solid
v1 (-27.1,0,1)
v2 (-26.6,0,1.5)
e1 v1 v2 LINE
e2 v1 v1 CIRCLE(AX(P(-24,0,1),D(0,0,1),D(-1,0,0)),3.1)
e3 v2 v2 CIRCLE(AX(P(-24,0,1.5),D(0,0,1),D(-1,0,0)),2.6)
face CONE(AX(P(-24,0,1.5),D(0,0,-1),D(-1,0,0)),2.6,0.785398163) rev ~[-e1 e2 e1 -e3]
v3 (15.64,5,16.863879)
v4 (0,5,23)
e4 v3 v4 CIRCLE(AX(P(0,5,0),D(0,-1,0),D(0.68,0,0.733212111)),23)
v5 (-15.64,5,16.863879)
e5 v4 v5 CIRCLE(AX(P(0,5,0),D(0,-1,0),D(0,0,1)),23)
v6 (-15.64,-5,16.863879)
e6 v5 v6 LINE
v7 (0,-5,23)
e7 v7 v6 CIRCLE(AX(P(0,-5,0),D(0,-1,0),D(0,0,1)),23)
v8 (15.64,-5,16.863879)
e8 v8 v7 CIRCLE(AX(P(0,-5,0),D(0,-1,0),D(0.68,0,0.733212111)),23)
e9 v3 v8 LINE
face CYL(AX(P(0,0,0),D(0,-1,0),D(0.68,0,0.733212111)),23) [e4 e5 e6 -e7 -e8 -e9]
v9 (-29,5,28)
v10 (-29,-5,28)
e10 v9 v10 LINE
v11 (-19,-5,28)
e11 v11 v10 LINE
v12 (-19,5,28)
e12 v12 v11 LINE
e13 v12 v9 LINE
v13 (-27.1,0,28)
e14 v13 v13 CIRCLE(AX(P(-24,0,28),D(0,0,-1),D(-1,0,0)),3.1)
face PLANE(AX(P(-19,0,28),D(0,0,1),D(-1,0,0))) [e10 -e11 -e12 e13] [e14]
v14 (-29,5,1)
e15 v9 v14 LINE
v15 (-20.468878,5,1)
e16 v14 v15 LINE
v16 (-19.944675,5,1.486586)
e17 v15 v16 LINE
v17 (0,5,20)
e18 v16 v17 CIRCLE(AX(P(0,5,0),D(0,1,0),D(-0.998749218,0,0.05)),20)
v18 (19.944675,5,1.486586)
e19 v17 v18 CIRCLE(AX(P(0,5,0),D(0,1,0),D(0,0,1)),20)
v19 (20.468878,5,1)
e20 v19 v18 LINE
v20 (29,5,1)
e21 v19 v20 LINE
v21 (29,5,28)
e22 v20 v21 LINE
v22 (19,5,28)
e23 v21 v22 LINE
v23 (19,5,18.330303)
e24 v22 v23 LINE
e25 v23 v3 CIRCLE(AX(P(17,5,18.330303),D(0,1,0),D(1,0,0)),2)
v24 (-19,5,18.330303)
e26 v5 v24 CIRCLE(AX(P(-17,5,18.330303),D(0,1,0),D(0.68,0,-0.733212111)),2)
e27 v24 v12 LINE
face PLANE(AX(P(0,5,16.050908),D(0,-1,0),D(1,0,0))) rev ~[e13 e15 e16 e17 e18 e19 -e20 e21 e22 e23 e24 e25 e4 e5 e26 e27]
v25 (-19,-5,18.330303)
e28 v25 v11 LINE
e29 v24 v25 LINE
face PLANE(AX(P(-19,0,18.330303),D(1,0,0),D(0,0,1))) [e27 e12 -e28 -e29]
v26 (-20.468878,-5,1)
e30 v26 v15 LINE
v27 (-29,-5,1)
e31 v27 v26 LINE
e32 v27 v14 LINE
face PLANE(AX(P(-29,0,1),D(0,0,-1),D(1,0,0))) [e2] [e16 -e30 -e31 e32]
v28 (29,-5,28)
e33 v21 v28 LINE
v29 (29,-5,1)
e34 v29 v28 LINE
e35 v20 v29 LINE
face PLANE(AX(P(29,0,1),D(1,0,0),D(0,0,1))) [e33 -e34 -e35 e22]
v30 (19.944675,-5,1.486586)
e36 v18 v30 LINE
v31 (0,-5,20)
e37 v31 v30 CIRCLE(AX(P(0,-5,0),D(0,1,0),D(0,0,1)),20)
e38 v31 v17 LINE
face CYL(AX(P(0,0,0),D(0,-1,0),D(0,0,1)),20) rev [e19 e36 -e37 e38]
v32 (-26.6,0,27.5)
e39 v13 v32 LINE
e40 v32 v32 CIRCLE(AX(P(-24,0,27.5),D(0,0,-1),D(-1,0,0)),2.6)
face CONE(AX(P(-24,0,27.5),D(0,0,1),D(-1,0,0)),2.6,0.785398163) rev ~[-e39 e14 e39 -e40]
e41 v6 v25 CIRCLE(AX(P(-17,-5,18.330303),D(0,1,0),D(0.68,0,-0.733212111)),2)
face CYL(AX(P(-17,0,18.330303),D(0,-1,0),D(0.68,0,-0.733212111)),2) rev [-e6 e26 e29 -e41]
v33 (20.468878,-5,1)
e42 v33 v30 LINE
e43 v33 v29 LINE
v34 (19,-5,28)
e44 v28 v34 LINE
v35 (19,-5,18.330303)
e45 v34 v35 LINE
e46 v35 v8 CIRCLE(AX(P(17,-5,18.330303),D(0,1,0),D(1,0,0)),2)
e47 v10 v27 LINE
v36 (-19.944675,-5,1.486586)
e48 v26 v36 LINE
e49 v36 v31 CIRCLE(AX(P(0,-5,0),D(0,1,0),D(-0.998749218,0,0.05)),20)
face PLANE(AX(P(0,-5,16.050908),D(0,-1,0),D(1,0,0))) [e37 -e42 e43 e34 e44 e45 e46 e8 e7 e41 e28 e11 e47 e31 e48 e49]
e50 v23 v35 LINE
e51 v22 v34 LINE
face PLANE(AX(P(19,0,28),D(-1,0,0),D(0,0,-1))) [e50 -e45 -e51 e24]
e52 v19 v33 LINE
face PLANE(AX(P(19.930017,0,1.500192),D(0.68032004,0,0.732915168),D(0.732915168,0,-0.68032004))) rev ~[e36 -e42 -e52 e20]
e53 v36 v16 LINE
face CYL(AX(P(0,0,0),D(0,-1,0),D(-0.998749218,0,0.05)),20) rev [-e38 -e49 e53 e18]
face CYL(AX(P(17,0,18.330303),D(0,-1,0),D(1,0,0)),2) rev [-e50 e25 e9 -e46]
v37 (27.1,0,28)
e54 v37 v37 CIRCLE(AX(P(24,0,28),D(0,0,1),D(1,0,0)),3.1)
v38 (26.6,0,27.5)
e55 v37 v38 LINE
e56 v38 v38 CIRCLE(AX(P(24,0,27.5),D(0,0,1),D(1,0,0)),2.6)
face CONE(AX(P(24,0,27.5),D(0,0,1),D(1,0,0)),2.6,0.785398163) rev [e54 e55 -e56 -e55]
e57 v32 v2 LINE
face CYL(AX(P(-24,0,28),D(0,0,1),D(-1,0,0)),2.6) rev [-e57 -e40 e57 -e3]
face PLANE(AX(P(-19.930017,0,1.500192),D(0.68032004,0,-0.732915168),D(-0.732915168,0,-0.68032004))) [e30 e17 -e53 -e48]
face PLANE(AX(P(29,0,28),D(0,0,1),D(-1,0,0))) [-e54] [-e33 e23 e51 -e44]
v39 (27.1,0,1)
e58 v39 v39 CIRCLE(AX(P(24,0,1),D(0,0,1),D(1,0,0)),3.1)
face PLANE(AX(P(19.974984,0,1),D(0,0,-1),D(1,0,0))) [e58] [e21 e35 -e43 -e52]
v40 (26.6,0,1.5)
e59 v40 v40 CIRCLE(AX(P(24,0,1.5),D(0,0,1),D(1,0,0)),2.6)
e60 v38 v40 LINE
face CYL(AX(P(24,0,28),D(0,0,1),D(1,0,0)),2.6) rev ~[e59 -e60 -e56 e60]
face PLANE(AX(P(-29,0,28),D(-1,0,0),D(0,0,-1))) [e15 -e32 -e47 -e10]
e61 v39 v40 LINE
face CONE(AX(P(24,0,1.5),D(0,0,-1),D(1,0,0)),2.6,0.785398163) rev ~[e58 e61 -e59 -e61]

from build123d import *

# Parameters (mm, degrees)
F1_DEPTH    = 5
F2_T1_DEPTH = 6.2718359258
F2_T3_DEPTH = 6.2718359258
F3_R        = 2.6
F4_DEPTH    = 27.001
F5_SIZE     = 0.5


# Not quite as in the source:
# - a fillet or chamfer that OpenCascade refuses, or shapes differently, is made with other operations: its cross-section is extruded or revolved along the edge and cut away or added
# - a pattern or mirror of a feature is missing from the dataset's text; its kind, count and spacing are read off the source's solid


with BuildPart() as f1:
    # F0 (on Front) → F1 (new body, symmetric)
    with BuildSketch(Plane.XZ):
        with BuildLine():
            ThreePointArc((0, 20), (13.7840487521, 14.4913767462), (19.9749843554, 1))
            Line((19.9749843554, 1), (29, 1))
            Line((29, 1), (29, 28))
            Line((29, 28), (19, 28))
            Line((19, 28), (19, 18.3303027798))
            ThreePointArc((19, 18.3303027798), (17.8, 16.4972725018), (15.64, 16.8638785574))
            ThreePointArc((15.64, 16.8638785574), (8.4003212194, 21.4110859933), (0, 23))
            ThreePointArc((0, 23), (-8.4003212194, 21.4110859933), (-15.64, 16.8638785574))
            ThreePointArc((-15.64, 16.8638785574), (-17.8, 16.4972725018), (-19, 18.3303027798))
            Line((-19, 18.3303027798), (-19, 28))
            Line((-19, 28), (-29, 28))
            Line((-29, 28), (-29, 1))
            Line((-29, 1), (-19.9749843554, 1))
            ThreePointArc((-19.9749843554, 1), (-13.7840487521, 14.4913767462), (0, 20))
        make_face()
    extrude(amount=F1_DEPTH, both=True)

    # F2: chamfer of 0.5 on 4 edges, made by hand

    # F2_s2 → F2_t1 (cut)
    with BuildSketch(Plane.XZ.offset(-6.2718359258)):
        with BuildLine():
            Line((19.9300167465, 1.500192138), (20.4835367376, 0.9863935992))
            Line((20.4835367376, 0.9863935992), (20.4835367376, 0.9763935992))
            ThreePointArc((20.4835367376, 0.9763935992), (20.2292605465, 0.99), (19.9749843554, 0.99))
            Line((19.9749843554, 0.99), (19.9649968633, 0.9995))
            ThreePointArc((19.9649968633, 0.9995), (19.9508800221, 1.249994537), (19.920044409, 1.4994488451))
            Line((19.920044409, 1.4994488451), (19.9300167465, 1.500192138))
        make_face()
        with BuildLine():
            Line((-19.9300167465, 1.500192138), (-20.4835367376, 0.9863935992))
            Line((-20.4835367376, 0.9863935992), (-20.4835367376, 0.9763935992))
            ThreePointArc((-20.4835367376, 0.9763935992), (-20.2292605465, 0.99), (-19.9749843554, 0.99))
            Line((-19.9749843554, 0.99), (-19.9649968633, 0.9995))
            ThreePointArc((-19.9649968633, 0.9995), (-19.9508800221, 1.249994537), (-19.920044409, 1.4994488451))
            Line((-19.920044409, 1.4994488451), (-19.9300167465, 1.500192138))
        make_face()
    extrude(amount=F2_T1_DEPTH, mode=Mode.SUBTRACT)

    # F2_s4 → F2_t3 (cut)
    with BuildSketch(Plane.XZ):
        with BuildLine():
            Line((19.9300167465, 1.500192138), (20.4835367376, 0.9863935992))
            Line((20.4835367376, 0.9863935992), (20.4835367376, 0.9763935992))
            ThreePointArc((20.4835367376, 0.9763935992), (20.2292605465, 0.99), (19.9749843554, 0.99))
            Line((19.9749843554, 0.99), (19.9649968633, 0.9995))
            ThreePointArc((19.9649968633, 0.9995), (19.9508800221, 1.249994537), (19.920044409, 1.4994488451))
            Line((19.920044409, 1.4994488451), (19.9300167465, 1.500192138))
        make_face()
        with BuildLine():
            Line((-19.9300167465, 1.500192138), (-20.4835367376, 0.9863935992))
            Line((-20.4835367376, 0.9863935992), (-20.4835367376, 0.9763935992))
            ThreePointArc((-20.4835367376, 0.9763935992), (-20.2292605465, 0.99), (-19.9749843554, 0.99))
            Line((-19.9749843554, 0.99), (-19.9649968633, 0.9995))
            ThreePointArc((-19.9649968633, 0.9995), (-19.9508800221, 1.249994537), (-19.920044409, 1.4994488451))
            Line((-19.920044409, 1.4994488451), (-19.9300167465, 1.500192138))
        make_face()
    extrude(amount=F2_T3_DEPTH, mode=Mode.SUBTRACT)

    # F3 (on face) → F4 (cut, through all)
    with BuildSketch(Plane.XY.offset(28)):
        with Locations((24, 0)):
            Circle(F3_R)
    f4 = extrude(amount=-F4_DEPTH, mode=Mode.SUBTRACT)

    # F4_copies: F4 across plane
    add(f4.mirror(Plane(origin=(0, 0, 0), x_dir=(0, 0, -1), z_dir=(-1, 0, 0))), mode=Mode.SUBTRACT)

    # F5
    f5_edges = [f1.edges().sort_by_distance(p)[0] for p in [
        (24, 2.6, 28),
        (24, -2.6, 28),
        (24, 2.6, 1),
        (-24, 2.6, 1),
        (-24, 2.6, 28),
        (24, -2.6, 1),
        (-24, -2.6, 1),
        (-24, -2.6, 28),
    ]]
    chamfer(f5_edges, length=F5_SIZE)


solid = f1.part
